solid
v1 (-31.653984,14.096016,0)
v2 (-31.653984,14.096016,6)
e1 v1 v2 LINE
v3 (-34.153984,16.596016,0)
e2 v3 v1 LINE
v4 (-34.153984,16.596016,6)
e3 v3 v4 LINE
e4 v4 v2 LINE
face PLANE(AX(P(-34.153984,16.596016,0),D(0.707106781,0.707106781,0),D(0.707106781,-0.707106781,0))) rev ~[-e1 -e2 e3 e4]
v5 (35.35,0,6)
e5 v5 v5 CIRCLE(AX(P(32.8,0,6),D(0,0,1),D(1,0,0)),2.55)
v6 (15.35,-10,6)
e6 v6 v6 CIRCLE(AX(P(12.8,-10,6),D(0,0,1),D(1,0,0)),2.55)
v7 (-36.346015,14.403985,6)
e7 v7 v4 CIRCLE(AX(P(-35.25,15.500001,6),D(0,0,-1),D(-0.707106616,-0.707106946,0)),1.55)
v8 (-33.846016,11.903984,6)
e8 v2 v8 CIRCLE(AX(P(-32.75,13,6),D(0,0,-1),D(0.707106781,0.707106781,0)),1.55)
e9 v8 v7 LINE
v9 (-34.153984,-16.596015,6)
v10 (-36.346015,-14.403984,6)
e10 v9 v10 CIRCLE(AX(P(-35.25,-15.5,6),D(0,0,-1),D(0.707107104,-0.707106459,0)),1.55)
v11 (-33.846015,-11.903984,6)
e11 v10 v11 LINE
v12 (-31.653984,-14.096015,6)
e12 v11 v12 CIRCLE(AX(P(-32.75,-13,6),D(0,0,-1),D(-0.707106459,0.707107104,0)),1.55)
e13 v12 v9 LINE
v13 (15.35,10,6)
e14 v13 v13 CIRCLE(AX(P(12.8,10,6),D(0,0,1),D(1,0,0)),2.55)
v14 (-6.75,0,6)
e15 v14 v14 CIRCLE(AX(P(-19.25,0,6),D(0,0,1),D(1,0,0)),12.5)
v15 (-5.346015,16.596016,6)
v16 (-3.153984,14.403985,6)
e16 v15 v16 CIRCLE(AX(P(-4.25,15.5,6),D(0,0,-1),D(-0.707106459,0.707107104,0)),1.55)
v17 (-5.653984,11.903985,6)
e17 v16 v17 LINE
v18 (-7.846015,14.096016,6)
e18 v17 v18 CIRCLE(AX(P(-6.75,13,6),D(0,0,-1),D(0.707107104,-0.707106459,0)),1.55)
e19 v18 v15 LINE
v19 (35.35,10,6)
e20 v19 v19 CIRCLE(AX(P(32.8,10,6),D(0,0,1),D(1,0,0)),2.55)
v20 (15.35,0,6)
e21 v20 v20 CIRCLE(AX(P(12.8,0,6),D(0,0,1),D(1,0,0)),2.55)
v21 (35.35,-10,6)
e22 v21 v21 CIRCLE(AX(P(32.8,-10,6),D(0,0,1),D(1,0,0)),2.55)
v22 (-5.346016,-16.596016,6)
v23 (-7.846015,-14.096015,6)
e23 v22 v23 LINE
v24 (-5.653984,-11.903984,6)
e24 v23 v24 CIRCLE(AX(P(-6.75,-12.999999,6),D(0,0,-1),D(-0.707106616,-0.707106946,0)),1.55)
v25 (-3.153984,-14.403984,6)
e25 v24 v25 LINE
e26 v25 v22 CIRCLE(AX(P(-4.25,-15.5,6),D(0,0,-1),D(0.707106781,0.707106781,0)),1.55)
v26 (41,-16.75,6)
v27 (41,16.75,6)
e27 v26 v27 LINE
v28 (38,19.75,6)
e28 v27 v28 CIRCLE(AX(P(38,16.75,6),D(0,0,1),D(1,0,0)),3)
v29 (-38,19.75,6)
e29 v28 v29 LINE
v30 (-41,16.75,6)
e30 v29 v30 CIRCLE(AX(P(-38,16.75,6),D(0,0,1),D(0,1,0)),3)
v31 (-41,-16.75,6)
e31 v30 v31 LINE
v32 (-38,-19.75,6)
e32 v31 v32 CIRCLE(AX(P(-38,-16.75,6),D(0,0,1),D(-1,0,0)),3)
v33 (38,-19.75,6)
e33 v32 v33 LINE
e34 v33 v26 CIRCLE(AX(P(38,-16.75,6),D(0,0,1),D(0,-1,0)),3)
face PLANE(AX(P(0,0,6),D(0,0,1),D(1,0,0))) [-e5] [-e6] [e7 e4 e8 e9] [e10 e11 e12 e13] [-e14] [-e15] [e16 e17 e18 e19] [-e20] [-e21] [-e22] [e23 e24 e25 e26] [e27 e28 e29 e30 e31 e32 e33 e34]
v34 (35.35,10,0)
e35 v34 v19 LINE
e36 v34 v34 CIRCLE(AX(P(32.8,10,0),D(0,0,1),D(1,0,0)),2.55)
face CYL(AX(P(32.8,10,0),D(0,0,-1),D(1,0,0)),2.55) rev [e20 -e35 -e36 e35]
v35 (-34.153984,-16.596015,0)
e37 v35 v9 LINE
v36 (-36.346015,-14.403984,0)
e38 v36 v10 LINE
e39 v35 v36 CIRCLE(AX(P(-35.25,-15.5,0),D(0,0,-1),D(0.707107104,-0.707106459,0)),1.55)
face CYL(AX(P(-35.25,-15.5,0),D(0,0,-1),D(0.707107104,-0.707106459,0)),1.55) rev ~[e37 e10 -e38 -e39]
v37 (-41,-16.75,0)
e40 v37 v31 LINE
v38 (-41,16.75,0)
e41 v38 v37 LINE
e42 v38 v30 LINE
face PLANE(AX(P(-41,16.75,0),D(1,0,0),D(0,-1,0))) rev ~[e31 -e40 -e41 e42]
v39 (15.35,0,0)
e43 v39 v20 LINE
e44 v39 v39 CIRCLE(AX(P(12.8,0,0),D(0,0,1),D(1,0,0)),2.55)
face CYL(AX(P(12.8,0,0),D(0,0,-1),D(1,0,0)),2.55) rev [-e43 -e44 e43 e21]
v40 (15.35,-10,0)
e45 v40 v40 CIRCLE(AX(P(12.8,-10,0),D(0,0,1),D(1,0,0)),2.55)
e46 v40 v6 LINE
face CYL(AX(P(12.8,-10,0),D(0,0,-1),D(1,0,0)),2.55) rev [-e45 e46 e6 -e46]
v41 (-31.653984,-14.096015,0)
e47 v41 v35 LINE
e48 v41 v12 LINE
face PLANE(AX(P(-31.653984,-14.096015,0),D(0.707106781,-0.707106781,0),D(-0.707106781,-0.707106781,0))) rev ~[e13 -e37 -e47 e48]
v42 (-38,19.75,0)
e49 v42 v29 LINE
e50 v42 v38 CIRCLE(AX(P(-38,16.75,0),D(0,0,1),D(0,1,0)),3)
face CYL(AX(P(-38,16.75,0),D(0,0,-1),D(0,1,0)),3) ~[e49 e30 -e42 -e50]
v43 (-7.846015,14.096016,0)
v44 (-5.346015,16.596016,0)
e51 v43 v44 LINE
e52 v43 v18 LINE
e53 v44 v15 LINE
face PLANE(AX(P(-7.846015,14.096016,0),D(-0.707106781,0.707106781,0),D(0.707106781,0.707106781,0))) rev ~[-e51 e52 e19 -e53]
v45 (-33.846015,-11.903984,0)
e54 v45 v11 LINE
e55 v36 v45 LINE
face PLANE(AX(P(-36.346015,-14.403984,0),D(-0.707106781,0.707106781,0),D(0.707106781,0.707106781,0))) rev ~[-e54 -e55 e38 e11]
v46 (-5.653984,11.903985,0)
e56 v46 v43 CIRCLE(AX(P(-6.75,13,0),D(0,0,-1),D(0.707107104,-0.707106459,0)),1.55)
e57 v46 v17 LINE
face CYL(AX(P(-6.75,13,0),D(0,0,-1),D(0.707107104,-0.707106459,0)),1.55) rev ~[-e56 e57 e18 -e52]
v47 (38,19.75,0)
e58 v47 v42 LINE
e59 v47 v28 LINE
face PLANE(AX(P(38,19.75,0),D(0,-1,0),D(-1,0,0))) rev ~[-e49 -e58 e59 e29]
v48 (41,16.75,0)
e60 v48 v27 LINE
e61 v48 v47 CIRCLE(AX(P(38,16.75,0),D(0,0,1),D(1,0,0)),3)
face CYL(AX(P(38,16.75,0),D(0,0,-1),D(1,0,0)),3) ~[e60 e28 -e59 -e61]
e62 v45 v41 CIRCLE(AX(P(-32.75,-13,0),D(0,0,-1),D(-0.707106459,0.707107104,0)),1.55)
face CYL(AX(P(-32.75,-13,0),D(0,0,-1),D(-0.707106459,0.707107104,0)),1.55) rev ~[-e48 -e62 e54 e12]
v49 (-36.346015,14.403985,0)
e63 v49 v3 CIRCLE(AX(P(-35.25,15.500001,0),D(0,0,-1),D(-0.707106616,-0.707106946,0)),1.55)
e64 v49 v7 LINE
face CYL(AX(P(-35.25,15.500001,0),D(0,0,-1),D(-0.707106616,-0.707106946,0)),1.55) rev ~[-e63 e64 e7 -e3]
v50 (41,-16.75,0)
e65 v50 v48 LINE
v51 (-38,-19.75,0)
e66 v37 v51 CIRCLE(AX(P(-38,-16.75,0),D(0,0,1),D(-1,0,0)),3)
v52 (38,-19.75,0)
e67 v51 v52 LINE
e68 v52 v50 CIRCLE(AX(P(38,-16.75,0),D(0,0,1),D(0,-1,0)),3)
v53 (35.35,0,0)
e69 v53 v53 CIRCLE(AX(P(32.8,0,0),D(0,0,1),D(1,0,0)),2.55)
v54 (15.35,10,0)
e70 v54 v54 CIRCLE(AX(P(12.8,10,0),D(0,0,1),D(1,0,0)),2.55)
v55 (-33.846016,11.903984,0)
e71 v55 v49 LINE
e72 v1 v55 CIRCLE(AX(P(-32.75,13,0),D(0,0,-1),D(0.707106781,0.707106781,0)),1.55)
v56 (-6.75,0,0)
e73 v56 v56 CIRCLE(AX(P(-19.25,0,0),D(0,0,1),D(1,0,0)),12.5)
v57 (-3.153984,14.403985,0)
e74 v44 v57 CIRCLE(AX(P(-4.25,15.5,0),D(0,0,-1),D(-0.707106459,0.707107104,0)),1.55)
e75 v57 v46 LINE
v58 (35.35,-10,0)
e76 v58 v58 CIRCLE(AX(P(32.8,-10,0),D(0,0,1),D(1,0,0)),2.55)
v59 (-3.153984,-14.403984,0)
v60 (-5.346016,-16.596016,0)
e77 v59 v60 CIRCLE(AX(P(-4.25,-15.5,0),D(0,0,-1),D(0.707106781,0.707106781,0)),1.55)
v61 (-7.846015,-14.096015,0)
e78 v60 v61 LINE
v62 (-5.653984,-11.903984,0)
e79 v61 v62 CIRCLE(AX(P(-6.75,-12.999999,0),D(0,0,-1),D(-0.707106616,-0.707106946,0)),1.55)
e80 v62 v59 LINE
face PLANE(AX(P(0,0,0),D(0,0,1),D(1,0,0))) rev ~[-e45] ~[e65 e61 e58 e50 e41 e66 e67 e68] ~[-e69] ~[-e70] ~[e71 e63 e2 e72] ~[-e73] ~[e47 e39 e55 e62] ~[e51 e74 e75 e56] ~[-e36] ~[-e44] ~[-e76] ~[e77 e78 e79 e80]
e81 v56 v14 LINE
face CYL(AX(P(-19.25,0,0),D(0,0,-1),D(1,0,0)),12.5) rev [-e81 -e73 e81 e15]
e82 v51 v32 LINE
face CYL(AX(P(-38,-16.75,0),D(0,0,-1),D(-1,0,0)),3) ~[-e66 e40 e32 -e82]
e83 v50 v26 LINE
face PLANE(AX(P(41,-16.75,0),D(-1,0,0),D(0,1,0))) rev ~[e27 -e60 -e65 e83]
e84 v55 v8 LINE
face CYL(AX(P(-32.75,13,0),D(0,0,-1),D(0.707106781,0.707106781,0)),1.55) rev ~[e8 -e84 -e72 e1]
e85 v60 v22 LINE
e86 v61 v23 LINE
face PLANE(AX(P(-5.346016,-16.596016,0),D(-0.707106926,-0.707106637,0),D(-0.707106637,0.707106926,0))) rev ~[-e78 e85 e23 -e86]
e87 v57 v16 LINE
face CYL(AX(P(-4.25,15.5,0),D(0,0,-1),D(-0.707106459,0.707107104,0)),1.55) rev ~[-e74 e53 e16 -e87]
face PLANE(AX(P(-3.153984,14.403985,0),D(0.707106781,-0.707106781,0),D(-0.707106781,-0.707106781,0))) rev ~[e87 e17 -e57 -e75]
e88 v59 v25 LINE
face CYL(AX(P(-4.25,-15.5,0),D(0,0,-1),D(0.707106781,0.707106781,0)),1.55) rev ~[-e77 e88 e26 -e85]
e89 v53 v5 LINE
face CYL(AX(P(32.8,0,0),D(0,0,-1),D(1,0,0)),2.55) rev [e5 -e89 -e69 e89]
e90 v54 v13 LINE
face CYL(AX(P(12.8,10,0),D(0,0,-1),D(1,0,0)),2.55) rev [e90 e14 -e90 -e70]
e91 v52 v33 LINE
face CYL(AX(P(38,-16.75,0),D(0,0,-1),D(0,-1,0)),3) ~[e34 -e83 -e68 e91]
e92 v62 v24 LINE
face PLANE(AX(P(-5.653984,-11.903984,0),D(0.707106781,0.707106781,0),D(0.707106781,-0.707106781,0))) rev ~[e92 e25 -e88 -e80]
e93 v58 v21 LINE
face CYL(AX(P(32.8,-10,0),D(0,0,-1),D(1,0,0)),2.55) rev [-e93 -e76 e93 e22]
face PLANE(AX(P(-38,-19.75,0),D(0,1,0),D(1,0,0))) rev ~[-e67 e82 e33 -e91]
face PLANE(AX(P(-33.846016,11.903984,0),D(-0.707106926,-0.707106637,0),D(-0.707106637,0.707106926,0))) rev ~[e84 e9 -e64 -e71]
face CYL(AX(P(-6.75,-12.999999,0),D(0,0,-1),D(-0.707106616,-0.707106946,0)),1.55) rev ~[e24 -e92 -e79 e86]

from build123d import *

# Parameters (mm, degrees)
F0_R     = 12.5
F0_R_2   = 2.55
F1_DEPTH = 6


# Not quite as in the source:
# - ends of sketch curves that miss each other by under 0.0002 mm in the source are joined


with BuildPart() as f1:
    # F0 (on Top) → F1 (new body)
    with BuildSketch(Plane.XY):
        with BuildLine():
            Line((38, 19.75), (-38, 19.75))
            ThreePointArc((-38, 19.75), (-40.1213203436, 18.8713203436), (-41, 16.75))
            Line((-41, 16.75), (-41, -16.75))
            ThreePointArc((-41, -16.75), (-40.1213203436, -18.8713203436), (-38, -19.75))
            Line((-38, -19.75), (38, -19.75))
            ThreePointArc((38, -19.75), (40.1213203436, -18.8713203436), (41, -16.75))
            Line((41, -16.75), (41, 16.75))
            ThreePointArc((41, 16.75), (40.1213203436, 18.8713203436), (38, 19.75))
        make_face()
        with BuildLine():
            ThreePointArc((-34.1539839892, -16.5960150108), (-36.3460155108, -16.5960155108), (-36.3460150108, -14.4039839892))
            Line((-36.346015, -14.403984), (-33.846015, -11.903984))
            ThreePointArc((-33.8460150108, -11.9039839892), (-31.6539844892, -11.9039844892), (-31.6539839892, -14.0960150108))
            Line((-31.653984, -14.096015), (-34.153984, -16.596015))
        make_face(mode=Mode.SUBTRACT)
        with BuildLine():
            ThreePointArc((-3.1539844892, -14.4039844892), (-3.1539844892, -16.5960155108), (-5.3460155108, -16.5960155108))
            Line((-5.3460155108, -16.5960155108), (-7.846015, -14.096015))
            ThreePointArc((-7.846015, -14.096015), (-7.8460155108, -11.9039844892), (-5.6539844892, -11.9039844892))
            Line((-5.6539844892, -11.9039844892), (-3.1539844892, -14.4039844892))
        make_face(mode=Mode.SUBTRACT)
        with Locations((-19.25, 0)):
            Circle(F0_R, mode=Mode.SUBTRACT)
        with Locations((12.8, -10)):
            Circle(F0_R_2, mode=Mode.SUBTRACT)
        with Locations((32.8, -10)):
            Circle(F0_R_2, mode=Mode.SUBTRACT)
        with Locations((12.8, 0)):
            Circle(F0_R_2, mode=Mode.SUBTRACT)
        with Locations((32.8, 0)):
            Circle(F0_R_2, mode=Mode.SUBTRACT)
        with BuildLine():
            ThreePointArc((-31.6539844892, 14.0960155108), (-31.6539844892, 11.9039844892), (-33.8460155108, 11.9039844892))
            Line((-33.8460155108, 11.9039844892), (-36.346015, 14.403985))
            ThreePointArc((-36.346015, 14.403985), (-36.3460155108, 16.5960155108), (-34.1539844892, 16.5960155108))
            Line((-34.1539844892, 16.5960155108), (-31.6539844892, 14.0960155108))
        make_face(mode=Mode.SUBTRACT)
        with BuildLine():
            ThreePointArc((-5.3460150108, 16.5960160108), (-3.1539844892, 16.5960155108), (-3.1539839892, 14.4039849892))
            Line((-3.153984, 14.403985), (-5.653984, 11.903985))
            ThreePointArc((-5.6539839892, 11.9039849892), (-7.8460155108, 11.9039844892), (-7.8460150108, 14.0960160108))
            Line((-7.846015, 14.096016), (-5.346015, 16.596016))
        make_face(mode=Mode.SUBTRACT)
        with Locations((12.8, 10)):
            Circle(F0_R_2, mode=Mode.SUBTRACT)
        with Locations((32.8, 10)):
            Circle(F0_R_2, mode=Mode.SUBTRACT)
    extrude(amount=F1_DEPTH)


solid = f1.part
